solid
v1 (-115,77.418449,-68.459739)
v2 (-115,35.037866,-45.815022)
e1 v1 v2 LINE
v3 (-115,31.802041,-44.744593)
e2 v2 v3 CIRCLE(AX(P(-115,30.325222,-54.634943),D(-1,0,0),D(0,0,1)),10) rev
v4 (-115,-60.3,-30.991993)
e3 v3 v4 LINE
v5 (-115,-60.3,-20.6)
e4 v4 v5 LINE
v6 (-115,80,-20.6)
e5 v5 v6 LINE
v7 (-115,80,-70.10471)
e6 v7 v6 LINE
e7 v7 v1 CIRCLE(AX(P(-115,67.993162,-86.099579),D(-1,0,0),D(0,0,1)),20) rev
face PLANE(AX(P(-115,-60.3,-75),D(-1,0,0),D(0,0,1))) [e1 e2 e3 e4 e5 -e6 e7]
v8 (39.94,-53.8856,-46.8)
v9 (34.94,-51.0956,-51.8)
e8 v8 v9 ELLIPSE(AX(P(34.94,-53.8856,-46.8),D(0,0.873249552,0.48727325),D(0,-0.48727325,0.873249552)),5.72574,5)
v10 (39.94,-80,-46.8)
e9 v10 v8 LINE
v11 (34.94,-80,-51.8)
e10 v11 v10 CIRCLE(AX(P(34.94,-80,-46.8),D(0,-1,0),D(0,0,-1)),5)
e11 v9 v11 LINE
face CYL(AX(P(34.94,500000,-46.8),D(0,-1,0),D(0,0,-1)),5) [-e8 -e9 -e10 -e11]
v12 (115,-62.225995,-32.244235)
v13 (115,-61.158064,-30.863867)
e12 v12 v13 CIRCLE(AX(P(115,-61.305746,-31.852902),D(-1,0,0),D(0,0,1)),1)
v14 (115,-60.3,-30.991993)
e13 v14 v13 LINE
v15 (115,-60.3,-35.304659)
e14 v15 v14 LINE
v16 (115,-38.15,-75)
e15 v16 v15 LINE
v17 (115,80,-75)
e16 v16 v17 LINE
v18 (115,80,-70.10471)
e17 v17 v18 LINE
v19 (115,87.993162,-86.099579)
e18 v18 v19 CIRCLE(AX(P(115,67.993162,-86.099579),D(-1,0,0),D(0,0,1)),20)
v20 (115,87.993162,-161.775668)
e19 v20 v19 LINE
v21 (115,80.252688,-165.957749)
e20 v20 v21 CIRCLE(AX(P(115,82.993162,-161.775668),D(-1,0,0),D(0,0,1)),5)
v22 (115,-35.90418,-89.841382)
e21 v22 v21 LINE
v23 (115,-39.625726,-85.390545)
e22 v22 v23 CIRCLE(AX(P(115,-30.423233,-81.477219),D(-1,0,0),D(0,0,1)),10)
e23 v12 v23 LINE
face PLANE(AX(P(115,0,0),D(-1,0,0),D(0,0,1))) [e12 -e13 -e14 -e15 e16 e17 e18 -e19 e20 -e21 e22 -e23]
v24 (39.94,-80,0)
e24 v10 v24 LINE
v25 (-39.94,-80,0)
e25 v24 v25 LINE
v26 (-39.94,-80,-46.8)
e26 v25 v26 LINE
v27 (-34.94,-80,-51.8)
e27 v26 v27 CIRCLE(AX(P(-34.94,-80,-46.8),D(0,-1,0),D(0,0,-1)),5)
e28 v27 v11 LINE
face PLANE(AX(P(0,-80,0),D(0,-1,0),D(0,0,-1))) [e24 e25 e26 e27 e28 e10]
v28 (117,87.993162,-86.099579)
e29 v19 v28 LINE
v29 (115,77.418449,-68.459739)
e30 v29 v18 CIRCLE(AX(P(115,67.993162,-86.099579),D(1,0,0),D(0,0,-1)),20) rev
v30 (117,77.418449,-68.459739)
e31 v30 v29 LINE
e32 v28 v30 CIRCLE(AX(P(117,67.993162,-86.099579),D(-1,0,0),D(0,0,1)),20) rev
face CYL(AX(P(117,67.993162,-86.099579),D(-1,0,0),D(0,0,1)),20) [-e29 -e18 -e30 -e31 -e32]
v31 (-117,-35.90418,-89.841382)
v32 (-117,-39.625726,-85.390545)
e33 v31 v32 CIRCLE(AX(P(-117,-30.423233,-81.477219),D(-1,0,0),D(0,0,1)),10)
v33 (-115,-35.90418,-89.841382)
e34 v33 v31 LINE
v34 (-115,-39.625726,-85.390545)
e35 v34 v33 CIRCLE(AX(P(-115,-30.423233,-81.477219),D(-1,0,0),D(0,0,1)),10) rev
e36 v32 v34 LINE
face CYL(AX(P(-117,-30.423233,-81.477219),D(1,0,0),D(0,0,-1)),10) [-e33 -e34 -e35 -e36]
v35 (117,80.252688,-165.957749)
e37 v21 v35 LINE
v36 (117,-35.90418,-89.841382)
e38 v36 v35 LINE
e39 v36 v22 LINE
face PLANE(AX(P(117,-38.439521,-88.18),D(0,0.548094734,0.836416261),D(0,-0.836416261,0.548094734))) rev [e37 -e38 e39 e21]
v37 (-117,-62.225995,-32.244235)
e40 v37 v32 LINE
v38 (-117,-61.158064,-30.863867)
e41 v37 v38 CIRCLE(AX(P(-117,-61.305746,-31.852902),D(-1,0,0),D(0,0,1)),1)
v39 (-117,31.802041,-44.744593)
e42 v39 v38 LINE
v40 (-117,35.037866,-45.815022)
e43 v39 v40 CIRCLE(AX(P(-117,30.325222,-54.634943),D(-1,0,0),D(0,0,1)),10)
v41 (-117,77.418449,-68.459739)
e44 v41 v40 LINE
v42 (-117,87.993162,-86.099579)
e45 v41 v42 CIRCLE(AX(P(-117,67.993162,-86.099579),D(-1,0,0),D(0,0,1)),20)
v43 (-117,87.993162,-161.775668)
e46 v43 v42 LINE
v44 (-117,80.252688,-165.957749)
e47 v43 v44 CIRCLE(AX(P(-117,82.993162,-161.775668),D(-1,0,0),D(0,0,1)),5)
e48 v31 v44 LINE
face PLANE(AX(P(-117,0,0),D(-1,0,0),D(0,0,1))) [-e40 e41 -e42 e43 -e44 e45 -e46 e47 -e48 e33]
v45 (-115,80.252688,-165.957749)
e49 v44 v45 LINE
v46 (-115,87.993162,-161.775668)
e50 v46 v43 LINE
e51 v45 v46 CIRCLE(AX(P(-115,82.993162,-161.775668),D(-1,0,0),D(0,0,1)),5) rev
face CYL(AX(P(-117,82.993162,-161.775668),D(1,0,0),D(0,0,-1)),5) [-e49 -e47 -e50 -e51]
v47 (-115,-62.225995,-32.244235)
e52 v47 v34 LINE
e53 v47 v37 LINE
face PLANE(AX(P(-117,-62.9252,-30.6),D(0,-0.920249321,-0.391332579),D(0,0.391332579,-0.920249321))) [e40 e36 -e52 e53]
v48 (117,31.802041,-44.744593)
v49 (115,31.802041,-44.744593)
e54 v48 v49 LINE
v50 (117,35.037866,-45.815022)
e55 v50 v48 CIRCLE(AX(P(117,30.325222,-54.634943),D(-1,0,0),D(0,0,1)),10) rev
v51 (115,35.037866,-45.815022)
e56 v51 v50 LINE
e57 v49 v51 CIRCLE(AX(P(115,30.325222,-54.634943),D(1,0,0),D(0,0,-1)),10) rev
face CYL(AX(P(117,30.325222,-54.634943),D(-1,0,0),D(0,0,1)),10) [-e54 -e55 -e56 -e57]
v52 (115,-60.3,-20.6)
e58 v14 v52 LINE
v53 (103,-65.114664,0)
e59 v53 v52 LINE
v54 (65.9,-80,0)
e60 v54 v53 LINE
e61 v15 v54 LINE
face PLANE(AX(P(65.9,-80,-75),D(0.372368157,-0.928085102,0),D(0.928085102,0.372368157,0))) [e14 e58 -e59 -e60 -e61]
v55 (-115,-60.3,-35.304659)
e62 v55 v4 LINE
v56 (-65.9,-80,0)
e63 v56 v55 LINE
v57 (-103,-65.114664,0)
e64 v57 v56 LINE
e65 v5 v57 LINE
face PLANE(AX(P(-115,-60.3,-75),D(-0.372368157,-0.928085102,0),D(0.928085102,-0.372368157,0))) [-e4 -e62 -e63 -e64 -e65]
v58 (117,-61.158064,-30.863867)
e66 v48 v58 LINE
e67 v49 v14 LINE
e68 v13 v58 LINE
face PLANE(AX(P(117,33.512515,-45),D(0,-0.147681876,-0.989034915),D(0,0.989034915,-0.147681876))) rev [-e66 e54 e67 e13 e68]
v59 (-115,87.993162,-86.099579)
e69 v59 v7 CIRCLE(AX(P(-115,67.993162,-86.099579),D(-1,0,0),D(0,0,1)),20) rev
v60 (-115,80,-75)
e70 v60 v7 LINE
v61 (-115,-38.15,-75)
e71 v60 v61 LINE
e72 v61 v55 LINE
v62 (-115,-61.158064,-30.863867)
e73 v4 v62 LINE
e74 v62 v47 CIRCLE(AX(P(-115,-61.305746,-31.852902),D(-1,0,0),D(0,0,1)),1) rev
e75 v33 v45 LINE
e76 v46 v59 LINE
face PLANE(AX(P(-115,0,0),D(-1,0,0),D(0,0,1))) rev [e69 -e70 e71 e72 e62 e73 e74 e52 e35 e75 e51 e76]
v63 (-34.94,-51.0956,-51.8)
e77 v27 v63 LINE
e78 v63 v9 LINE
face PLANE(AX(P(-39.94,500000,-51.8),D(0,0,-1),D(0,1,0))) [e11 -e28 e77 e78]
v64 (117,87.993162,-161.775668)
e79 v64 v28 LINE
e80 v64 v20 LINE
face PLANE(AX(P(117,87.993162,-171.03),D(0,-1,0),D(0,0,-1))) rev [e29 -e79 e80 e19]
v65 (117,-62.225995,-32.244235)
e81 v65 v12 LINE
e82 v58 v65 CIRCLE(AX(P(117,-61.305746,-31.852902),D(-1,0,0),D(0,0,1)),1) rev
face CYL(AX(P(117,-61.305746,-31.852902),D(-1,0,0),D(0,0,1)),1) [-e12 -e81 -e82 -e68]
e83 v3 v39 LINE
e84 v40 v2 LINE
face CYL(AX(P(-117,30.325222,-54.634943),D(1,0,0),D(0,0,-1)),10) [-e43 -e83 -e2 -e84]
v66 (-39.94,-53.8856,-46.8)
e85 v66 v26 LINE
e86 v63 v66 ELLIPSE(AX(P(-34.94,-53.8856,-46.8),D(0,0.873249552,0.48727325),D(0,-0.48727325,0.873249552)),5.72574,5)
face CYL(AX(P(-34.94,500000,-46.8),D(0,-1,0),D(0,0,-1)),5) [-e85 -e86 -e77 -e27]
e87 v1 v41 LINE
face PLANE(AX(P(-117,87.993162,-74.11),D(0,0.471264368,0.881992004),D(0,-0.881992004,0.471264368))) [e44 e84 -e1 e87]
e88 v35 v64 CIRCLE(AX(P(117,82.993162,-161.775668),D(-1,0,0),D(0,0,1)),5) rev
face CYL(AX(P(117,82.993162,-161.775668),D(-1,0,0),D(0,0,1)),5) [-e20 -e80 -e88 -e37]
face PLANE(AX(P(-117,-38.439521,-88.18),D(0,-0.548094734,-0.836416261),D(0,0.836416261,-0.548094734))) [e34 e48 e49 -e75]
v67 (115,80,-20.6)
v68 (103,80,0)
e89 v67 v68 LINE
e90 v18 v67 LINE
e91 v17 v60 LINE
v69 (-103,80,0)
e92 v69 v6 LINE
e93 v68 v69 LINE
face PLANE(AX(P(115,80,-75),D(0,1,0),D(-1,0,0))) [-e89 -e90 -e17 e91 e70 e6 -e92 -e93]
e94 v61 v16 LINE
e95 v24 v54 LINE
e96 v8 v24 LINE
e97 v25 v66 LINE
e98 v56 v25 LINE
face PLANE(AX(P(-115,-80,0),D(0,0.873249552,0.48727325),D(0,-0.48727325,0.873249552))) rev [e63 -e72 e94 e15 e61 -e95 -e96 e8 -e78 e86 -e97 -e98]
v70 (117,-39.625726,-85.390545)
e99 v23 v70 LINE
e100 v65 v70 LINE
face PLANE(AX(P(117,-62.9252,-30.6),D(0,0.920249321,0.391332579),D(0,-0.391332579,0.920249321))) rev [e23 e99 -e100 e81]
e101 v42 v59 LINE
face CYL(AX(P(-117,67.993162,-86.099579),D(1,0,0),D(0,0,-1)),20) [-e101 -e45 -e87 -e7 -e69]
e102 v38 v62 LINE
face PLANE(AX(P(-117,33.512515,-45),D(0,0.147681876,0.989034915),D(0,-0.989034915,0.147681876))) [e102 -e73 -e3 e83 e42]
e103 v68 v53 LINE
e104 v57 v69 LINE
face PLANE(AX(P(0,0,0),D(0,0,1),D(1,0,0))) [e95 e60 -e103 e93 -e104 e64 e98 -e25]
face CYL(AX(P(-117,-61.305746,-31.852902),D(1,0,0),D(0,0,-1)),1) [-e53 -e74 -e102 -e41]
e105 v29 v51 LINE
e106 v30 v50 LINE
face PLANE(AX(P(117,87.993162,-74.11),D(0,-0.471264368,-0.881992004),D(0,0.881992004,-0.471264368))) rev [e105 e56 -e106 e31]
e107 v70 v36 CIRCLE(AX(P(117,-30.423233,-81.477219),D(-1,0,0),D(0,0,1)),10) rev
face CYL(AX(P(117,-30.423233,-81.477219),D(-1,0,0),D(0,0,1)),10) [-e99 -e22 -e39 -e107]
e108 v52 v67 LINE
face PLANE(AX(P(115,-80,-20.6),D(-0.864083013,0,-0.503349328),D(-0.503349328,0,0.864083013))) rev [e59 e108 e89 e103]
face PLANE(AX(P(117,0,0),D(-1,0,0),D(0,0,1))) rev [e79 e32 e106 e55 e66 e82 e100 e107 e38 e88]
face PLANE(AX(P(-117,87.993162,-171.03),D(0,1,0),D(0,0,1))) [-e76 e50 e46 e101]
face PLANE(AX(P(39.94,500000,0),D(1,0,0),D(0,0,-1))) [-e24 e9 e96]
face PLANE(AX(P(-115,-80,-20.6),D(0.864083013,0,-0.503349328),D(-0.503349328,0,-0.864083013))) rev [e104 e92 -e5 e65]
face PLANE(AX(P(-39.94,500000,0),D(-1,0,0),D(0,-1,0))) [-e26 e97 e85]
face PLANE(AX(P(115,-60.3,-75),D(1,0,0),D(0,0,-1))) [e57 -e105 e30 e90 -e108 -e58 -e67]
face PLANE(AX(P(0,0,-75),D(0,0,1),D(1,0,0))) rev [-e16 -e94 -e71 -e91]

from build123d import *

# Parameters (mm, degrees)
BOSS_EXTRUDE1_DEPTH     = 75
CUT_EXTRUDE1_DEPTH      = 159.902485821
CUT_EXTRUDE1_DEPTH_BACK = 159.902485821
CUT_EXTRUDE2_DEPTH      = 159.902485821
CUT_EXTRUDE2_DEPTH_BACK = 159.902485821
BOSS_EXTRUDE3_START     = 115
BOSS_EXTRUDE3_DEPTH     = 2
BOSS_EXTRUDE5_START     = -115
BOSS_EXTRUDE5_DEPTH     = 2
FILLET3_R               = 5
FILLET4_R               = 20
FILLET5_R               = 10
FILLET6_R               = 10
FILLET7_R               = 10
FILLET8_R               = 10
FILLET11_R              = 1
BOSS_EXTRUDE6_REACH     = 266.055
SKETCH7_W               = 79.88
SKETCH7_H               = 51.8
FILLET13_R              = 5


with BuildPart() as part:
    # Sketch2 → Boss-Extrude1 (new body)
    with BuildSketch(Plane.XY):
        Polygon((-115, -60.3), (-65.9, -80), (65.9, -80), (115, -60.3), (115, 80), (-115, 80), align=None)
    extrude(amount=-BOSS_EXTRUDE1_DEPTH)

    # Sketch3 → Cut-Extrude1 (cut, two sides: drawn at the far end of the back side and taken through both)
    with BuildSketch(Plane(origin=(0, 0, 0), x_dir=(0, 0, -1), z_dir=(1, 0, 0)).offset(-CUT_EXTRUDE1_DEPTH_BACK)):
        Polygon((0, -80), (75, -38.15), (75, -80), align=None)
    extrude(amount=CUT_EXTRUDE1_DEPTH + CUT_EXTRUDE1_DEPTH_BACK, mode=Mode.SUBTRACT)

    # Sketch4 → Cut-Extrude2 (cut, two sides: drawn at the far end of the back side and taken through both)
    with BuildSketch(Plane(origin=(0, 0, 0), x_dir=(1, 0, 0), z_dir=(0, 1, 0)).offset(-CUT_EXTRUDE2_DEPTH_BACK)):
        Polygon((-115, 20.6), (-103, 0), (-115, 0), align=None)
        Polygon((115, 20.6), (103, 0), (115, 0), align=None)
    extrude(amount=CUT_EXTRUDE2_DEPTH + CUT_EXTRUDE2_DEPTH_BACK, mode=Mode.SUBTRACT)

    # Sketch5 → Boss-Extrude3 (add)
    with BuildSketch(Plane(origin=(0, 0, 0), x_dir=(0, 0, -1), z_dir=(1, 0, 0)).offset(BOSS_EXTRUDE3_START)):
        Polygon((30.6, -62.9252), (88.18, -38.439520512), (171.03, 87.993161576), (74.11, 87.993161576), (45, 33.512515472), align=None)
    extrude(amount=BOSS_EXTRUDE3_DEPTH)

    # Sketch6 → Boss-Extrude5 (add)
    with BuildSketch(Plane(origin=(0, 0, 0), x_dir=(0, 0, -1), z_dir=(1, 0, 0)).offset(BOSS_EXTRUDE5_START)):
        Polygon((30.6, -62.9252), (88.18, -38.439520512), (171.03, 87.993161576), (74.11, 87.993161576), (45, 33.512515472), align=None)
    extrude(amount=-BOSS_EXTRUDE5_DEPTH)

    # Fillet3
    fillet3_edges = [part.edges().sort_by_distance(p)[0] for p in [
        (116, 87.993161576, -171.03),
        (-116, 87.993161576, -171.03),
    ]]
    fillet(fillet3_edges, radius=FILLET3_R)

    # Fillet4
    # the kernel refuses this fillet: 20 mm, written as the material it takes off along each edge
    with BuildSketch(Plane(origin=(115, 87.993161576, -74.11), x_dir=(0, -0.8819920042873963, 0.4712643678160927), z_dir=(1, 0, 0)), Plane(origin=(-115, 87.993161576, -74.11), x_dir=(0, 0, -1), z_dir=(-1, 0, 0))) as fillet4_piece_1:
        with BuildLine():
            CenterArc((FILLET4_R * 0.599478940414, FILLET4_R), FILLET4_R, 208.116400727, 61.883599273)
            Line((-FILLET4_R * 0.282513063873, FILLET4_R * 0.528735632184), (0, 0))
            Line((0, 0), (FILLET4_R * 0.599478940414, 0))
        make_face()
    extrude(amount=31.973947021, mode=Mode.SUBTRACT)

    # Fillet5
    fillet5_edges = [part.edges().sort_by_distance(p)[0] for p in [
        (116, 33.512515472, -45),
    ]]
    fillet(fillet5_edges, radius=FILLET5_R)

    # Fillet6
    fillet6_edges = [part.edges().sort_by_distance(p)[0] for p in [
        (-116, -38.439520512, -88.18),
    ]]
    fillet(fillet6_edges, radius=FILLET6_R)

    # Fillet7
    fillet7_edges = [part.edges().sort_by_distance(p)[0] for p in [
        (-116, 33.512515472, -45),
    ]]
    fillet(fillet7_edges, radius=FILLET7_R)

    # Fillet8
    fillet8_edges = [part.edges().sort_by_distance(p)[0] for p in [
        (116, -38.439520512, -88.18),
    ]]
    fillet(fillet8_edges, radius=FILLET8_R)

    # Fillet11
    fillet11_edges = [part.edges().sort_by_distance(p)[0] for p in [
        (116, -62.9252, -30.6),
        (-116, -62.9252, -30.6),
    ]]
    fillet(fillet11_edges, radius=FILLET11_R)

    # Sketch7 → Boss-Extrude6 (add, up to next)
    with BuildSketch(Plane(origin=(0, -80, 0), x_dir=(-1, 0, 0), z_dir=(0, -1, 0)), mode=Mode.PRIVATE) as boss_extrude6_sk1:
        with Locations((0, 25.9)):
            Rectangle(SKETCH7_W, SKETCH7_H)
    boss_extrude6_tool1 = extrude(boss_extrude6_sk1.sketch, amount=-BOSS_EXTRUDE6_REACH, mode=Mode.PRIVATE) - part.part
    add(boss_extrude6_tool1.solids().sort_by_distance((0, -80, -25.9))[0])

    # Fillet13
    fillet13_edges = [part.edges().sort_by_distance(p)[0] for p in [
        (39.94, -65.5478, -51.8),
        (-39.94, -65.5478, -51.8),
    ]]
    fillet(fillet13_edges, radius=FILLET13_R)


solid = part.part
